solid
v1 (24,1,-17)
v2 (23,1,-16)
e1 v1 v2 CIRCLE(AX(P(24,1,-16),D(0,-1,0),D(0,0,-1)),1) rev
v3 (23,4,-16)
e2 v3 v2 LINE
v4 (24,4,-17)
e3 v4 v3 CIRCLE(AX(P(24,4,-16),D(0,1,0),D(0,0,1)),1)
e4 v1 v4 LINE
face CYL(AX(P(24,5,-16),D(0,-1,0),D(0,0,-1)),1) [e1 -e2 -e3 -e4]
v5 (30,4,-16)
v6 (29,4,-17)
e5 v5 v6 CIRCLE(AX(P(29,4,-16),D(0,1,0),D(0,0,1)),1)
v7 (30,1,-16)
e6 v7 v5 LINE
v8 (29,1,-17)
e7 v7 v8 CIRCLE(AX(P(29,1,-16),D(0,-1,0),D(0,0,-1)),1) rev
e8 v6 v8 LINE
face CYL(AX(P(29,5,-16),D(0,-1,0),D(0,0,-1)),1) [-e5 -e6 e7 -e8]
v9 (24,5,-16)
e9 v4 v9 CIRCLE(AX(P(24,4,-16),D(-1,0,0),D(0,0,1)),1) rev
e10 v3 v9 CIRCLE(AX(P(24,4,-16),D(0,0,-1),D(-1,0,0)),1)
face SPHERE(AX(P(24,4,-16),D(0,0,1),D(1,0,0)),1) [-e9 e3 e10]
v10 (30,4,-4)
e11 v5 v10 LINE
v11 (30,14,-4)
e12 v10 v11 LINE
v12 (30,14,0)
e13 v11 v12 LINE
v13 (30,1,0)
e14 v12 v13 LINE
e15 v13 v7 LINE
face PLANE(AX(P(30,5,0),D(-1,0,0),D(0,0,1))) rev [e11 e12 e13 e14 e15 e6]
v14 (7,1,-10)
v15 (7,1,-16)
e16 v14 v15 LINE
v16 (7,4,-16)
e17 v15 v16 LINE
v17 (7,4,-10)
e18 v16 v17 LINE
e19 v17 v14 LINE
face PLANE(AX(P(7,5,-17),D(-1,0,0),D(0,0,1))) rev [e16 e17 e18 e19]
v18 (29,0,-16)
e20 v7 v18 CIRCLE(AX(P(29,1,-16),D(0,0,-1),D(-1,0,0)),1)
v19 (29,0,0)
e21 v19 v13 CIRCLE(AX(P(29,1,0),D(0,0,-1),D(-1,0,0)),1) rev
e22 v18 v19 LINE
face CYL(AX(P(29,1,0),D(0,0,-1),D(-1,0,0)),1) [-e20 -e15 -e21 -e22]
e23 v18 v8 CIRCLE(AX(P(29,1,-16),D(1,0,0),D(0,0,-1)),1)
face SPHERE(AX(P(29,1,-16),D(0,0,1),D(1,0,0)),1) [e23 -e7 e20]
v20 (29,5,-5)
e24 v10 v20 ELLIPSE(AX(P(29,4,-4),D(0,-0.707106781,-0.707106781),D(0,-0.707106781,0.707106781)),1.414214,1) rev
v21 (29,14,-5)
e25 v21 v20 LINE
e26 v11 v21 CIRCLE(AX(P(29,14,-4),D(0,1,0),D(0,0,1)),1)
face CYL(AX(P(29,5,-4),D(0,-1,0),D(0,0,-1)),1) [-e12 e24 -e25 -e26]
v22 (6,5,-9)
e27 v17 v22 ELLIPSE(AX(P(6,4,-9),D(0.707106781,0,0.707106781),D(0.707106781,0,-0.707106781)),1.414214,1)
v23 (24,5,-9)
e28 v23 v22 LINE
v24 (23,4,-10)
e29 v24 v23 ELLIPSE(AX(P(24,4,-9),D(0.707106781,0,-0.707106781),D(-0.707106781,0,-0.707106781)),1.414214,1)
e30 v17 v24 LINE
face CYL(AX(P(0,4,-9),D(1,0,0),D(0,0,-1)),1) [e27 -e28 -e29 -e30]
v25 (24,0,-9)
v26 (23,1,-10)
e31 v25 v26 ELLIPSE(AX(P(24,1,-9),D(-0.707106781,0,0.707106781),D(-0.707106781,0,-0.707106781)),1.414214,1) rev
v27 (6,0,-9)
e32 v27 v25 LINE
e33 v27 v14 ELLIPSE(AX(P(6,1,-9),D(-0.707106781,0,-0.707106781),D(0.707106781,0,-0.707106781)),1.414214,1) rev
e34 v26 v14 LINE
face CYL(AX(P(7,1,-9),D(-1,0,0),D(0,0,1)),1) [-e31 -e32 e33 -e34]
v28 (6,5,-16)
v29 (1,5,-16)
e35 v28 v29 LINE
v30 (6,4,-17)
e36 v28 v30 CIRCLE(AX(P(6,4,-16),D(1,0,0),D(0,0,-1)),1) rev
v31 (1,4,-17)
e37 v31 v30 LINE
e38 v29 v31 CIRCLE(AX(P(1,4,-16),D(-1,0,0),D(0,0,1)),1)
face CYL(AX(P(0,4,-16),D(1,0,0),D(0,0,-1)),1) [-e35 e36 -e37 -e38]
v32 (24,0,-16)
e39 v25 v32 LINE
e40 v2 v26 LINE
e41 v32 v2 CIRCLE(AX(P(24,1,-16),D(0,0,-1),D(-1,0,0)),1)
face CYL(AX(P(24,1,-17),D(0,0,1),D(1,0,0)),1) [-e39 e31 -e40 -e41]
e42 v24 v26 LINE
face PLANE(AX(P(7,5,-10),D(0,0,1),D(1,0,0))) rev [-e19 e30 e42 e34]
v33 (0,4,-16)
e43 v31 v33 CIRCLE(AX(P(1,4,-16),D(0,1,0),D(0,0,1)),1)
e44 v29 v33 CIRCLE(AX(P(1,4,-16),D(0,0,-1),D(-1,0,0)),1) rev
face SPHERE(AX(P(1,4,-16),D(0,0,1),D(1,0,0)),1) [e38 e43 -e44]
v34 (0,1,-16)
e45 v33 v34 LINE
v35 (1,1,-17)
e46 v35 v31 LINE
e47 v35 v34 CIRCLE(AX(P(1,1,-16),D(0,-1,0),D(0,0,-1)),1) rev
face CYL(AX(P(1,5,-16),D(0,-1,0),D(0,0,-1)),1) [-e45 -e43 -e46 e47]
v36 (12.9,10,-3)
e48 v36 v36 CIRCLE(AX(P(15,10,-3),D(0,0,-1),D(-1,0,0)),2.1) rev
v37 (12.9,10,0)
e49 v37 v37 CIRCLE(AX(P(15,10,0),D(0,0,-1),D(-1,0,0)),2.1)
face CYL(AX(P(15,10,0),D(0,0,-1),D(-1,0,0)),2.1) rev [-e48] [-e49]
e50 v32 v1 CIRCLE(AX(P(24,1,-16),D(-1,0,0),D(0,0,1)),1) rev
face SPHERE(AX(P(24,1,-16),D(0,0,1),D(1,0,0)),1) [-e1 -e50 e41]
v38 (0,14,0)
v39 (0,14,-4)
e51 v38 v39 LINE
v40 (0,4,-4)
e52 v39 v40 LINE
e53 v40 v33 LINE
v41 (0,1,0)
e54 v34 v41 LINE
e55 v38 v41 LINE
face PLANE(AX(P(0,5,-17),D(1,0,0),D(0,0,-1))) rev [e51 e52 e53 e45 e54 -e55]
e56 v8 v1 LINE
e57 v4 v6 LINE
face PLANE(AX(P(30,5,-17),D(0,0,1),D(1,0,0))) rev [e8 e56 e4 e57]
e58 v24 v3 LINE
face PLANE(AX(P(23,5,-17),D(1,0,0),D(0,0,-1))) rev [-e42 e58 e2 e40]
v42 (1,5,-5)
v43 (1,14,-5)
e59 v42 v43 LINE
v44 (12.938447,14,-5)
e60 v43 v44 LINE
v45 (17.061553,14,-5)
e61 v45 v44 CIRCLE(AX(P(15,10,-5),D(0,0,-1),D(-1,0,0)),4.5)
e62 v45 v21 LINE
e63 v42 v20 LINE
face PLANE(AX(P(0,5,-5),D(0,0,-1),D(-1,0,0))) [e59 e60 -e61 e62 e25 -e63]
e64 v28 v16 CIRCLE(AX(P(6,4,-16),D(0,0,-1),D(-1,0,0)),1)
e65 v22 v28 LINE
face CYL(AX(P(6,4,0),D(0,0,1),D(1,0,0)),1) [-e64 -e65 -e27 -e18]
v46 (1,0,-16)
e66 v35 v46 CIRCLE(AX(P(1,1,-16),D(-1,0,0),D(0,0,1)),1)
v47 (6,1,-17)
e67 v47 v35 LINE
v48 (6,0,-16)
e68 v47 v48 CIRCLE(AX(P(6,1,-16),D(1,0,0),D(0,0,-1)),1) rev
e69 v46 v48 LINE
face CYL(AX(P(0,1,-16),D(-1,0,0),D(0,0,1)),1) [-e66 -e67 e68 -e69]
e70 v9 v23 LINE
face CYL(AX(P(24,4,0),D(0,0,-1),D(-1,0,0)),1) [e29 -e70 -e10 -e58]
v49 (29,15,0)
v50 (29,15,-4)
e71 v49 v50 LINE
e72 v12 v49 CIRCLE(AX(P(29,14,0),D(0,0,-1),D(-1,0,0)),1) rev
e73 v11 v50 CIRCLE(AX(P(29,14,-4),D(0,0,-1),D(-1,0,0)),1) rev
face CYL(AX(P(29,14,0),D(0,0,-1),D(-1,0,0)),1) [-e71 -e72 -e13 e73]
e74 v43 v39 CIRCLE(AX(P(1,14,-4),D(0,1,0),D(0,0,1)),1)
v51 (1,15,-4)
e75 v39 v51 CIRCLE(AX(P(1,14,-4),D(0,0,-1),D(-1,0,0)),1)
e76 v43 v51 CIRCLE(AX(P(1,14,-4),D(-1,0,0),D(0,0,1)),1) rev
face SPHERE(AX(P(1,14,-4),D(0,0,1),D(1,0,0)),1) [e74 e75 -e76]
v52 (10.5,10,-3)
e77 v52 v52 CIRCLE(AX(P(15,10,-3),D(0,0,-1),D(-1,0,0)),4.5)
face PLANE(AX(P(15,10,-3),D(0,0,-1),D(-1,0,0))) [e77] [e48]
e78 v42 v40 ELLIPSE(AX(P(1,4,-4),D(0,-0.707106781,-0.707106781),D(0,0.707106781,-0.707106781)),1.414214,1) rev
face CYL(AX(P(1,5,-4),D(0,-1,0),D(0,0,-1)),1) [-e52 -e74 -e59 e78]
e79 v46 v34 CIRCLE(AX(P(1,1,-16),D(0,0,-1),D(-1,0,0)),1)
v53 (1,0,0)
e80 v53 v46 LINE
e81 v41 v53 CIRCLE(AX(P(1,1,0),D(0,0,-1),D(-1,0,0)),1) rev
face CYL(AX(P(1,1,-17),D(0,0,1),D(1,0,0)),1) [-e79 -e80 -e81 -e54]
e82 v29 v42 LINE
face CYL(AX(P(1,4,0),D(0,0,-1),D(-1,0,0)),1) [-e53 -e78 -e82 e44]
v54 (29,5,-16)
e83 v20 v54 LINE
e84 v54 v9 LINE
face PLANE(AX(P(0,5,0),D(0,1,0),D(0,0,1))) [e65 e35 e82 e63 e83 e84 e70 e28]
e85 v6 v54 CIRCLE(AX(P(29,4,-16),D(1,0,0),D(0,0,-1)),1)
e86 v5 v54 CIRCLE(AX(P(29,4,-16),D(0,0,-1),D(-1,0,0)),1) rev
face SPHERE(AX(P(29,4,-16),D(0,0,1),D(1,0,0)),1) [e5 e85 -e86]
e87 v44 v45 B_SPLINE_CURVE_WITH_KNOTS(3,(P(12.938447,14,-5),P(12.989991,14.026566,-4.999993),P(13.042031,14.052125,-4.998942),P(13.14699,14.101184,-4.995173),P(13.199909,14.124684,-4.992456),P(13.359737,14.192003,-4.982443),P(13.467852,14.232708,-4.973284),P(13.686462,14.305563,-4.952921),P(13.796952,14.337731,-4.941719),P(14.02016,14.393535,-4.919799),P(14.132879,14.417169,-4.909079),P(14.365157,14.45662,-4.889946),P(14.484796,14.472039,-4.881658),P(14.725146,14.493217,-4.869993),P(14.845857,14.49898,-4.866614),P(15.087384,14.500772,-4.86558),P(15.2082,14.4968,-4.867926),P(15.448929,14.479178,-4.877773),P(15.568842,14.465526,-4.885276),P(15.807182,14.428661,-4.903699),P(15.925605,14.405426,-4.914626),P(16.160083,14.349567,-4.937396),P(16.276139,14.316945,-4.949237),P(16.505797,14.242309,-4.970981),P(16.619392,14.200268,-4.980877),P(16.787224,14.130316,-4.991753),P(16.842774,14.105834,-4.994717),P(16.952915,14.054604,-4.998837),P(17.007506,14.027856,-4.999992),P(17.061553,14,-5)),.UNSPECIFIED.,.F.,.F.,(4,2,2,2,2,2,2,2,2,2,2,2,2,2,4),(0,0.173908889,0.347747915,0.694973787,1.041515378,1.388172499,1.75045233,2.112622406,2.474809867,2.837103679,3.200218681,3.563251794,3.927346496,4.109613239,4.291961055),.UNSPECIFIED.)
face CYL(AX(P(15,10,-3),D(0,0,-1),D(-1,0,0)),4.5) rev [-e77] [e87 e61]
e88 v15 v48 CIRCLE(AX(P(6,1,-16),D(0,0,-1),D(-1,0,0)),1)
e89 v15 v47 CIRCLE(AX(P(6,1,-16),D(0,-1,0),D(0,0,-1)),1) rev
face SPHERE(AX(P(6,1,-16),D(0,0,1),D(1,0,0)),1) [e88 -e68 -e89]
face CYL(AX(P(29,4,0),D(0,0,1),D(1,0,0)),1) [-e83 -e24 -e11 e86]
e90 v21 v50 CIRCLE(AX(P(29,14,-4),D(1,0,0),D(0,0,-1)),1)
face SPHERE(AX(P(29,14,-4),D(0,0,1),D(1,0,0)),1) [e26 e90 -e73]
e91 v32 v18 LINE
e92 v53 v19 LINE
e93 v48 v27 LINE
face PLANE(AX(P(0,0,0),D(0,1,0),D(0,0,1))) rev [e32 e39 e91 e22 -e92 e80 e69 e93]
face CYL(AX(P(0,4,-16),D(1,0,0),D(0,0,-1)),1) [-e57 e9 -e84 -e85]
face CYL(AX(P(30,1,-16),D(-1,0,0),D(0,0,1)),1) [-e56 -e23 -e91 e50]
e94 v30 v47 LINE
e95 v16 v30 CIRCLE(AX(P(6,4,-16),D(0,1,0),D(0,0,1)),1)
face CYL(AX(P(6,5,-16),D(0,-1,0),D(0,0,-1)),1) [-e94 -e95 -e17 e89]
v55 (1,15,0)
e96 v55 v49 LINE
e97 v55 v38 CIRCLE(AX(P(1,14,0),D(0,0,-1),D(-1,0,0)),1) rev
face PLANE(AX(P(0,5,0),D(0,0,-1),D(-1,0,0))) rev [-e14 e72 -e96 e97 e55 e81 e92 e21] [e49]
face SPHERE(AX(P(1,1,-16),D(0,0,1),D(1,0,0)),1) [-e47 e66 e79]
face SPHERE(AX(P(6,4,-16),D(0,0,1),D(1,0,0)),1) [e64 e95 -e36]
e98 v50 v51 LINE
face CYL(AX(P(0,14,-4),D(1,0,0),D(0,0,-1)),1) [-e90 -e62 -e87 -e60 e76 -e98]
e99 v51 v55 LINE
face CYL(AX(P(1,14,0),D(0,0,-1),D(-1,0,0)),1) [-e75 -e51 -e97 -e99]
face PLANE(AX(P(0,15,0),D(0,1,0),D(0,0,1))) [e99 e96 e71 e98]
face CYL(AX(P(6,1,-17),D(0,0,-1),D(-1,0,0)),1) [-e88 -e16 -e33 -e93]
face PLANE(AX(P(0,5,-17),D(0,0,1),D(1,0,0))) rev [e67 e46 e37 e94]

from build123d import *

# Parameters (mm, degrees)
Y_KSEKLIK_EKSTR_ZYON1_DEPTH = 5
IZIM2_W                     = 5
IZIM2_H                     = 10
Y_KSEKLIK_EKSTR_ZYON2_DEPTH = 30
IZIM3_R                     = 2.1
KES_EKSTR_ZYON3_DEPTH       = 5
IZIM4_R                     = 4.5
KES_EKSTR_ZYON4_DEPTH       = 2
RADYUS1_R                   = 1


with BuildPart() as part:
    # Çizim1 → Yükseklik-Ekstrüzyon1 (new body)
    with BuildSketch(Plane(origin=(0, 0, 0), x_dir=(1, 0, 0), z_dir=(0, 1, 0))):
        Polygon((0, 17), (0, 0), (30, 0), (30, 17), (23, 17), (23, 10), (7, 10), (7, 17), align=None)
    extrude(amount=Y_KSEKLIK_EKSTR_ZYON1_DEPTH)

    # Çizim2 → Yükseklik-Ekstrüzyon2 (add)
    with BuildSketch(Plane(origin=(30, 0, 0), x_dir=(0, 0, -1), z_dir=(1, 0, 0))):
        with Locations((2.5, 10)):
            Rectangle(IZIM2_W, IZIM2_H)
    extrude(amount=-Y_KSEKLIK_EKSTR_ZYON2_DEPTH)

    # Çizim3 → Kes-Ekstrüzyon3 (cut)
    with BuildSketch(Plane(origin=(0, 0, -5), x_dir=(-1, 0, 0), z_dir=(0, 0, -1))):
        with Locations((-15, 10)):
            Circle(IZIM3_R)
    extrude(amount=-KES_EKSTR_ZYON3_DEPTH, mode=Mode.SUBTRACT)

    # Çizim4 → Kes-Ekstrüzyon4 (cut)
    with BuildSketch(Plane(origin=(0, 0, -5), x_dir=(-1, 0, 0), z_dir=(0, 0, -1))):
        with Locations((-15, 10)):
            Circle(IZIM4_R)
    extrude(amount=-KES_EKSTR_ZYON4_DEPTH, mode=Mode.SUBTRACT)

    # Radyus1
    # the kernel refuses this fillet: 1 mm, written as the material it takes off along each edge
    with BuildSketch(Plane(origin=(1, 4, -16), x_dir=(0, 0, -1), z_dir=(-1, 0, 0))) as radyus1_piece_1_section:
        Polygon((0, 0), (RADYUS1_R, 0), (RADYUS1_R, -RADYUS1_R), (0, -RADYUS1_R), align=None)
    radyus1_piece_1 = extrude(amount=RADYUS1_R, mode=Mode.PRIVATE)
    radyus1_piece_1 = radyus1_piece_1 - Plane(origin=(1, 4, -16), x_dir=(0, -0.7071067811865475, 0.7071067811865475), z_dir=(-1, 0, 0)) * Sphere(RADYUS1_R, mode=Mode.PRIVATE)
    add(radyus1_piece_1, mode=Mode.SUBTRACT)
    with BuildSketch(Plane(origin=(24, 4, -16), x_dir=(0, 1, 0), z_dir=(-1, 0, 0))) as radyus1_piece_2_section:
        Polygon((0, 0), (RADYUS1_R, 0), (RADYUS1_R, RADYUS1_R), (0, RADYUS1_R), align=None)
    radyus1_piece_2 = extrude(amount=RADYUS1_R, mode=Mode.PRIVATE)
    radyus1_piece_2 = radyus1_piece_2 - Plane(origin=(24, 4, -16), x_dir=(0, -0.7071067811865475, 0.7071067811865475), z_dir=(-1, 0, 0)) * Sphere(RADYUS1_R, mode=Mode.PRIVATE)
    add(radyus1_piece_2, mode=Mode.SUBTRACT)
    with BuildSketch(Plane(origin=(29, 14, -4), x_dir=(0, 0, -1), z_dir=(1, 0, 0))) as radyus1_piece_3_section:
        Polygon((0, 0), (RADYUS1_R, 0), (RADYUS1_R, RADYUS1_R), (0, RADYUS1_R), align=None)
    radyus1_piece_3 = extrude(amount=RADYUS1_R, mode=Mode.PRIVATE)
    radyus1_piece_3 = radyus1_piece_3 - Plane(origin=(29, 14, -4), x_dir=(0, -0.7071067811865475, 0.7071067811865475), z_dir=(1, 0, 0)) * Sphere(RADYUS1_R, mode=Mode.PRIVATE)
    add(radyus1_piece_3, mode=Mode.SUBTRACT)
    with BuildSketch(Plane(origin=(1, 14, -4), x_dir=(0, 0, -1), z_dir=(-1, 0, 0))) as radyus1_piece_4_section:
        Polygon((0, 0), (RADYUS1_R, 0), (RADYUS1_R, -RADYUS1_R), (0, -RADYUS1_R), align=None)
    radyus1_piece_4 = extrude(amount=RADYUS1_R, mode=Mode.PRIVATE)
    radyus1_piece_4 = radyus1_piece_4 - Plane(origin=(1, 14, -4), x_dir=(0, -0.7071067811865475, 0.7071067811865475), z_dir=(-1, 0, 0)) * Sphere(RADYUS1_R, mode=Mode.PRIVATE)
    add(radyus1_piece_4, mode=Mode.SUBTRACT)
    with BuildSketch(Plane(origin=(29, 4, -16), x_dir=(0, 1, 0), z_dir=(0, 0, -1))) as radyus1_piece_5_section:
        Polygon((0, 0), (RADYUS1_R, 0), (RADYUS1_R, RADYUS1_R), (0, RADYUS1_R), align=None)
    radyus1_piece_5 = extrude(amount=RADYUS1_R, mode=Mode.PRIVATE)
    radyus1_piece_5 = radyus1_piece_5 - Plane(origin=(29, 4, -16), x_dir=(-0.7071067811865475, -0.7071067811865475, 0), z_dir=(0, 0, -1)) * Sphere(RADYUS1_R, mode=Mode.PRIVATE)
    add(radyus1_piece_5, mode=Mode.SUBTRACT)
    with BuildSketch(Plane(origin=(29, 1, -16), x_dir=(1, 0, 0), z_dir=(0, 0, -1))) as radyus1_piece_6_section:
        Polygon((0, 0), (RADYUS1_R, 0), (RADYUS1_R, RADYUS1_R), (0, RADYUS1_R), align=None)
    radyus1_piece_6 = extrude(amount=RADYUS1_R, mode=Mode.PRIVATE)
    radyus1_piece_6 = radyus1_piece_6 - Plane(origin=(29, 1, -16), x_dir=(-0.7071067811865475, 0.7071067811865475, 0), z_dir=(0, 0, -1)) * Sphere(RADYUS1_R, mode=Mode.PRIVATE)
    add(radyus1_piece_6, mode=Mode.SUBTRACT)
    with BuildSketch(Plane(origin=(24, 1, -16), x_dir=(0, 0, -1), z_dir=(-1, 0, 0))) as radyus1_piece_7_section:
        Polygon((0, 0), (RADYUS1_R, 0), (RADYUS1_R, RADYUS1_R), (0, RADYUS1_R), align=None)
    radyus1_piece_7 = extrude(amount=RADYUS1_R, mode=Mode.PRIVATE)
    radyus1_piece_7 = radyus1_piece_7 - Plane(origin=(24, 1, -16), x_dir=(0, 0.7071067811865475, 0.7071067811865475), z_dir=(-1, 0, 0)) * Sphere(RADYUS1_R, mode=Mode.PRIVATE)
    add(radyus1_piece_7, mode=Mode.SUBTRACT)
    with BuildSketch(Plane(origin=(6, 4, -16), x_dir=(0, 1, 0), z_dir=(0, 0, -1))) as radyus1_piece_8_section:
        Polygon((0, 0), (RADYUS1_R, 0), (RADYUS1_R, RADYUS1_R), (0, RADYUS1_R), align=None)
    radyus1_piece_8 = extrude(amount=RADYUS1_R, mode=Mode.PRIVATE)
    radyus1_piece_8 = radyus1_piece_8 - Plane(origin=(6, 4, -16), x_dir=(-0.7071067811865475, -0.7071067811865475, 0), z_dir=(0, 0, -1)) * Sphere(RADYUS1_R, mode=Mode.PRIVATE)
    add(radyus1_piece_8, mode=Mode.SUBTRACT)
    with BuildSketch(Plane(origin=(1, 1, -16), x_dir=(0, 0, -1), z_dir=(-1, 0, 0))) as radyus1_piece_9_section:
        Polygon((0, 0), (RADYUS1_R, 0), (RADYUS1_R, RADYUS1_R), (0, RADYUS1_R), align=None)
    radyus1_piece_9 = extrude(amount=RADYUS1_R, mode=Mode.PRIVATE)
    radyus1_piece_9 = radyus1_piece_9 - Plane(origin=(1, 1, -16), x_dir=(0, 0.7071067811865475, 0.7071067811865475), z_dir=(-1, 0, 0)) * Sphere(RADYUS1_R, mode=Mode.PRIVATE)
    add(radyus1_piece_9, mode=Mode.SUBTRACT)
    with BuildSketch(Plane(origin=(6, 1, -16), x_dir=(0, -1, 0), z_dir=(0, 0, -1))) as radyus1_piece_10_section:
        Polygon((0, 0), (RADYUS1_R, 0), (RADYUS1_R, -RADYUS1_R), (0, -RADYUS1_R), align=None)
    radyus1_piece_10 = extrude(amount=RADYUS1_R, mode=Mode.PRIVATE)
    radyus1_piece_10 = radyus1_piece_10 - Plane(origin=(6, 1, -16), x_dir=(-0.7071067811865475, 0.7071067811865475, 0), z_dir=(0, 0, -1)) * Sphere(RADYUS1_R, mode=Mode.PRIVATE)
    add(radyus1_piece_10, mode=Mode.SUBTRACT)
    with BuildSketch(Plane(origin=(0, 5, -16), x_dir=(0, -1, 0), z_dir=(0, 0, 1))) as radyus1_piece_11:
        with BuildLine():
            CenterArc((RADYUS1_R, RADYUS1_R), RADYUS1_R, 180, 90)
            Line((0, RADYUS1_R), (0, 0))
            Line((0, 0), (RADYUS1_R, 0))
        make_face()
    extrude(amount=11, mode=Mode.SUBTRACT)
    with BuildSketch(Plane(origin=(23, 5, -16), x_dir=(1, 0, 0), z_dir=(0, 0, 1)), Plane(origin=(7, 5, -10), x_dir=(-1, 0, 0), z_dir=(0, 0, -1))) as radyus1_piece_12:
        with BuildLine():
            CenterArc((RADYUS1_R, -RADYUS1_R), RADYUS1_R, 90, 90)
            Line((0, -RADYUS1_R), (0, 0))
            Line((0, 0), (RADYUS1_R, 0))
        make_face()
    extrude(amount=6, mode=Mode.SUBTRACT)
    with BuildSketch(Plane(origin=(30, 5, -5), x_dir=(-1, 0, 0), z_dir=(0, 1, 0)), Plane(origin=(0, 5, -5), x_dir=(0, 0, 1), z_dir=(0, 1, 0))) as radyus1_piece_13:
        with BuildLine():
            CenterArc((RADYUS1_R, RADYUS1_R), RADYUS1_R, 180, 90)
            Line((0, RADYUS1_R), (0, 0))
            Line((0, 0), (RADYUS1_R, 0))
        make_face()
    extrude(amount=9, mode=Mode.SUBTRACT)
    with BuildSketch(Plane(origin=(29, 15, -5), x_dir=(0, -1, 0), z_dir=(-1, 0, 0))) as radyus1_piece_14:
        with BuildLine():
            CenterArc((RADYUS1_R, RADYUS1_R), RADYUS1_R, 180, 90)
            Line((0, RADYUS1_R), (0, 0))
            Line((0, 0), (RADYUS1_R, 0))
        make_face()
    extrude(amount=28, mode=Mode.SUBTRACT)
    with BuildSketch(Plane(origin=(30, 5, -5), x_dir=(-1, 0, 0), z_dir=(0, 0, -1))) as radyus1_piece_15:
        with BuildLine():
            CenterArc((RADYUS1_R, -RADYUS1_R), RADYUS1_R, 90, 90)
            Line((0, -RADYUS1_R), (0, 0))
            Line((0, 0), (RADYUS1_R, 0))
        make_face()
    extrude(amount=11, mode=Mode.SUBTRACT)
    with BuildSketch(Plane(origin=(30, 1, -17), x_dir=(-1, 0, 0), z_dir=(0, 1, 0)), Plane(origin=(23, 1, -17), x_dir=(0, 0, 1), z_dir=(0, 1, 0)), Plane(origin=(0, 1, -17), x_dir=(0, 0, 1), z_dir=(0, 1, 0)), Plane(origin=(7, 1, -17), x_dir=(-1, 0, 0), z_dir=(0, 1, 0))) as radyus1_piece_16:
        with BuildLine():
            CenterArc((RADYUS1_R, RADYUS1_R), RADYUS1_R, 180, 90)
            Line((0, RADYUS1_R), (0, 0))
            Line((0, 0), (RADYUS1_R, 0))
        make_face()
    extrude(amount=3, mode=Mode.SUBTRACT)
    with BuildSketch(Plane(origin=(29, 5, -17), x_dir=(0, 0, 1), z_dir=(-1, 0, 0)), Plane(origin=(6, 0, -17), x_dir=(0, 1, 0), z_dir=(-1, 0, 0))) as radyus1_piece_17:
        with BuildLine():
            CenterArc((RADYUS1_R, -RADYUS1_R), RADYUS1_R, 90, 90)
            Line((0, -RADYUS1_R), (0, 0))
            Line((0, 0), (RADYUS1_R, 0))
        make_face()
    extrude(amount=5, mode=Mode.SUBTRACT)
    with BuildSketch(Plane(origin=(23, 5, -10), x_dir=(0, 0, 1), z_dir=(-1, 0, 0))) as radyus1_piece_18:
        with BuildLine():
            CenterArc((RADYUS1_R, -RADYUS1_R), RADYUS1_R, 90, 90)
            Line((0, -RADYUS1_R), (0, 0))
            Line((0, 0), (RADYUS1_R, 0))
        make_face()
    extrude(amount=16, mode=Mode.SUBTRACT)
    with BuildSketch(Plane(origin=(6, 5, -17), x_dir=(0, -1, 0), z_dir=(-1, 0, 0)), Plane(origin=(29, 0, -17), x_dir=(0, 0, 1), z_dir=(-1, 0, 0))) as radyus1_piece_19:
        with BuildLine():
            CenterArc((RADYUS1_R, RADYUS1_R), RADYUS1_R, 180, 90)
            Line((0, RADYUS1_R), (0, 0))
            Line((0, 0), (RADYUS1_R, 0))
        make_face()
    extrude(amount=5, mode=Mode.SUBTRACT)
    with BuildSketch(Plane(origin=(0, 0, -16), x_dir=(0, 1, 0), z_dir=(0, 0, 1))) as radyus1_piece_20:
        with BuildLine():
            CenterArc((RADYUS1_R, -RADYUS1_R), RADYUS1_R, 90, 90)
            Line((0, -RADYUS1_R), (0, 0))
            Line((0, 0), (RADYUS1_R, 0))
        make_face()
    extrude(amount=18.5, mode=Mode.SUBTRACT)
    with BuildSketch(Plane(origin=(7, 0, -10), x_dir=(-1, 0, 0), z_dir=(0, 0, -1)), Plane(origin=(23, 0, -16), x_dir=(1, 0, 0), z_dir=(0, 0, 1))) as radyus1_piece_21:
        with BuildLine():
            CenterArc((RADYUS1_R, RADYUS1_R), RADYUS1_R, 180, 90)
            Line((0, RADYUS1_R), (0, 0))
            Line((0, 0), (RADYUS1_R, 0))
        make_face()
    extrude(amount=6, mode=Mode.SUBTRACT)
    with BuildSketch(Plane(origin=(23, 0, -10), x_dir=(0, 0, 1), z_dir=(-1, 0, 0))) as radyus1_piece_22:
        with BuildLine():
            CenterArc((RADYUS1_R, RADYUS1_R), RADYUS1_R, 180, 90)
            Line((0, RADYUS1_R), (0, 0))
            Line((0, 0), (RADYUS1_R, 0))
        make_face()
    extrude(amount=16, mode=Mode.SUBTRACT)
    with BuildSketch(Plane(origin=(30, 0, 2.5), x_dir=(-1, 0, 0), z_dir=(0, 0, -1))) as radyus1_piece_23:
        with BuildLine():
            CenterArc((RADYUS1_R, RADYUS1_R), RADYUS1_R, 180, 90)
            Line((0, RADYUS1_R), (0, 0))
            Line((0, 0), (RADYUS1_R, 0))
        make_face()
    extrude(amount=18.5, mode=Mode.SUBTRACT)
    with BuildSketch(Plane(origin=(30, 15, -4), x_dir=(-1, 0, 0), z_dir=(0, 0, 1)), Plane(origin=(0, 15, -4), x_dir=(0, -1, 0), z_dir=(0, 0, 1))) as radyus1_piece_24:
        with BuildLine():
            CenterArc((RADYUS1_R, RADYUS1_R), RADYUS1_R, 180, 90)
            Line((0, RADYUS1_R), (0, 0))
            Line((0, 0), (RADYUS1_R, 0))
        make_face()
    extrude(amount=6.5, mode=Mode.SUBTRACT)
    with BuildSketch(Plane(origin=(0, 5, -16), x_dir=(0, -1, 0), z_dir=(0, 0, 1))) as radyus1_piece_25a_section:
        with BuildLine():
            CenterArc((RADYUS1_R, RADYUS1_R), RADYUS1_R, 180, 90)
            Line((0, RADYUS1_R), (0, 0))
            Line((0, 0), (RADYUS1_R, 0))
        make_face()
    radyus1_piece_25a = extrude(amount=13.5, mode=Mode.PRIVATE)
    radyus1_piece_25a = split(radyus1_piece_25a, bisect_by=Plane(origin=(0.226395114, 4.773604886, -5), z_dir=(0, 0, 1)), keep=Keep.TOP, mode=Mode.PRIVATE)
    with BuildSketch(Plane(origin=(0, 2.5, -5), x_dir=(0, 0, 1), z_dir=(0, 1, 0))) as radyus1_piece_25b_section:
        with BuildLine():
            CenterArc((RADYUS1_R, RADYUS1_R), RADYUS1_R, 180, 90)
            Line((0, RADYUS1_R), (0, 0))
            Line((0, 0), (RADYUS1_R, 0))
        make_face()
    radyus1_piece_25b = extrude(amount=11.5, mode=Mode.PRIVATE)
    radyus1_piece_25b = split(radyus1_piece_25b, bisect_by=Plane(origin=(0.226395114, 5, -4.773604886), z_dir=(0, -1, 0)), keep=Keep.TOP, mode=Mode.PRIVATE)
    radyus1_piece_25 = radyus1_piece_25a & radyus1_piece_25b
    add(radyus1_piece_25, mode=Mode.SUBTRACT)
    with BuildSketch(Plane(origin=(25.5, 5, -10), x_dir=(0, 0, 1), z_dir=(-1, 0, 0))) as radyus1_piece_26a_section:
        with BuildLine():
            CenterArc((RADYUS1_R, -RADYUS1_R), RADYUS1_R, 90, 90)
            Line((0, -RADYUS1_R), (0, 0))
            Line((0, 0), (RADYUS1_R, 0))
        make_face()
    radyus1_piece_26a = extrude(amount=18.5, mode=Mode.PRIVATE)
    radyus1_piece_26a = split(radyus1_piece_26a, bisect_by=Plane(origin=(23, 4.773604886, -9.773604886), z_dir=(1, 0, 0)), keep=Keep.TOP, mode=Mode.PRIVATE)
    with BuildSketch(Plane(origin=(23, 5, -16), x_dir=(1, 0, 0), z_dir=(0, 0, 1))) as radyus1_piece_26b_section:
        with BuildLine():
            CenterArc((RADYUS1_R, -RADYUS1_R), RADYUS1_R, 90, 90)
            Line((0, -RADYUS1_R), (0, 0))
            Line((0, 0), (RADYUS1_R, 0))
        make_face()
    radyus1_piece_26b = extrude(amount=8.5, mode=Mode.PRIVATE)
    radyus1_piece_26b = split(radyus1_piece_26b, bisect_by=Plane(origin=(23.226395114, 4.773604886, -10), z_dir=(0, 0, 1)), keep=Keep.TOP, mode=Mode.PRIVATE)
    radyus1_piece_26 = radyus1_piece_26a & radyus1_piece_26b
    add(radyus1_piece_26, mode=Mode.SUBTRACT)
    with BuildSketch(Plane(origin=(30, 5, -2.5), x_dir=(-1, 0, 0), z_dir=(0, 0, -1))) as radyus1_piece_27a_section:
        with BuildLine():
            CenterArc((RADYUS1_R, -RADYUS1_R), RADYUS1_R, 90, 90)
            Line((0, -RADYUS1_R), (0, 0))
            Line((0, 0), (RADYUS1_R, 0))
        make_face()
    radyus1_piece_27a = extrude(amount=13.5, mode=Mode.PRIVATE)
    radyus1_piece_27a = split(radyus1_piece_27a, bisect_by=Plane(origin=(29.773604886, 4.773604886, -5), z_dir=(0, 0, 1)), keep=Keep.TOP, mode=Mode.PRIVATE)
    with BuildSketch(Plane(origin=(30, 2.5, -5), x_dir=(-1, 0, 0), z_dir=(0, 1, 0))) as radyus1_piece_27b_section:
        with BuildLine():
            CenterArc((RADYUS1_R, RADYUS1_R), RADYUS1_R, 180, 90)
            Line((0, RADYUS1_R), (0, 0))
            Line((0, 0), (RADYUS1_R, 0))
        make_face()
    radyus1_piece_27b = extrude(amount=11.5, mode=Mode.PRIVATE)
    radyus1_piece_27b = split(radyus1_piece_27b, bisect_by=Plane(origin=(29.773604886, 5, -4.773604886), z_dir=(0, -1, 0)), keep=Keep.TOP, mode=Mode.PRIVATE)
    radyus1_piece_27 = radyus1_piece_27a & radyus1_piece_27b
    add(radyus1_piece_27, mode=Mode.SUBTRACT)
    with BuildSketch(Plane(origin=(7, 5, -7.5), x_dir=(-1, 0, 0), z_dir=(0, 0, -1))) as radyus1_piece_28a_section:
        with BuildLine():
            CenterArc((RADYUS1_R, -RADYUS1_R), RADYUS1_R, 90, 90)
            Line((0, -RADYUS1_R), (0, 0))
            Line((0, 0), (RADYUS1_R, 0))
        make_face()
    radyus1_piece_28a = extrude(amount=8.5, mode=Mode.PRIVATE)
    radyus1_piece_28a = split(radyus1_piece_28a, bisect_by=Plane(origin=(6.773604886, 4.773604886, -10), z_dir=(0, 0, 1)), keep=Keep.TOP, mode=Mode.PRIVATE)
    with BuildSketch(Plane(origin=(23, 5, -10), x_dir=(0, 0, 1), z_dir=(-1, 0, 0))) as radyus1_piece_28b_section:
        with BuildLine():
            CenterArc((RADYUS1_R, -RADYUS1_R), RADYUS1_R, 90, 90)
            Line((0, -RADYUS1_R), (0, 0))
            Line((0, 0), (RADYUS1_R, 0))
        make_face()
    radyus1_piece_28b = extrude(amount=18.5, mode=Mode.PRIVATE)
    radyus1_piece_28b = split(radyus1_piece_28b, bisect_by=Plane(origin=(7, 4.773604886, -9.773604886), z_dir=(-1, 0, 0)), keep=Keep.TOP, mode=Mode.PRIVATE)
    radyus1_piece_28 = radyus1_piece_28a & radyus1_piece_28b
    add(radyus1_piece_28, mode=Mode.SUBTRACT)
    with BuildSketch(Plane(origin=(23, 0, -10), x_dir=(0, 0, 1), z_dir=(-1, 0, 0))) as radyus1_piece_29a_section:
        with BuildLine():
            CenterArc((RADYUS1_R, RADYUS1_R), RADYUS1_R, 180, 90)
            Line((0, RADYUS1_R), (0, 0))
            Line((0, 0), (RADYUS1_R, 0))
        make_face()
    radyus1_piece_29a = extrude(amount=18.5, mode=Mode.PRIVATE)
    radyus1_piece_29a = split(radyus1_piece_29a, bisect_by=Plane(origin=(7, 0.226395114, -9.773604886), z_dir=(-1, 0, 0)), keep=Keep.TOP, mode=Mode.PRIVATE)
    with BuildSketch(Plane(origin=(7, 0, -7.5), x_dir=(-1, 0, 0), z_dir=(0, 0, -1))) as radyus1_piece_29b_section:
        with BuildLine():
            CenterArc((RADYUS1_R, RADYUS1_R), RADYUS1_R, 180, 90)
            Line((0, RADYUS1_R), (0, 0))
            Line((0, 0), (RADYUS1_R, 0))
        make_face()
    radyus1_piece_29b = extrude(amount=8.5, mode=Mode.PRIVATE)
    radyus1_piece_29b = split(radyus1_piece_29b, bisect_by=Plane(origin=(6.773604886, 0.226395114, -10), z_dir=(0, 0, 1)), keep=Keep.TOP, mode=Mode.PRIVATE)
    radyus1_piece_29 = radyus1_piece_29a & radyus1_piece_29b
    add(radyus1_piece_29, mode=Mode.SUBTRACT)
    with BuildSketch(Plane(origin=(23, 0, -16), x_dir=(1, 0, 0), z_dir=(0, 0, 1))) as radyus1_piece_30a_section:
        with BuildLine():
            CenterArc((RADYUS1_R, RADYUS1_R), RADYUS1_R, 180, 90)
            Line((0, RADYUS1_R), (0, 0))
            Line((0, 0), (RADYUS1_R, 0))
        make_face()
    radyus1_piece_30a = extrude(amount=8.5, mode=Mode.PRIVATE)
    radyus1_piece_30a = split(radyus1_piece_30a, bisect_by=Plane(origin=(23.226395114, 0.226395114, -10), z_dir=(0, 0, 1)), keep=Keep.TOP, mode=Mode.PRIVATE)
    with BuildSketch(Plane(origin=(25.5, 0, -10), x_dir=(0, 0, 1), z_dir=(-1, 0, 0))) as radyus1_piece_30b_section:
        with BuildLine():
            CenterArc((RADYUS1_R, RADYUS1_R), RADYUS1_R, 180, 90)
            Line((0, RADYUS1_R), (0, 0))
            Line((0, 0), (RADYUS1_R, 0))
        make_face()
    radyus1_piece_30b = extrude(amount=18.5, mode=Mode.PRIVATE)
    radyus1_piece_30b = split(radyus1_piece_30b, bisect_by=Plane(origin=(23, 0.226395114, -9.773604886), z_dir=(1, 0, 0)), keep=Keep.TOP, mode=Mode.PRIVATE)
    radyus1_piece_30 = radyus1_piece_30a & radyus1_piece_30b
    add(radyus1_piece_30, mode=Mode.SUBTRACT)


solid = part.part
